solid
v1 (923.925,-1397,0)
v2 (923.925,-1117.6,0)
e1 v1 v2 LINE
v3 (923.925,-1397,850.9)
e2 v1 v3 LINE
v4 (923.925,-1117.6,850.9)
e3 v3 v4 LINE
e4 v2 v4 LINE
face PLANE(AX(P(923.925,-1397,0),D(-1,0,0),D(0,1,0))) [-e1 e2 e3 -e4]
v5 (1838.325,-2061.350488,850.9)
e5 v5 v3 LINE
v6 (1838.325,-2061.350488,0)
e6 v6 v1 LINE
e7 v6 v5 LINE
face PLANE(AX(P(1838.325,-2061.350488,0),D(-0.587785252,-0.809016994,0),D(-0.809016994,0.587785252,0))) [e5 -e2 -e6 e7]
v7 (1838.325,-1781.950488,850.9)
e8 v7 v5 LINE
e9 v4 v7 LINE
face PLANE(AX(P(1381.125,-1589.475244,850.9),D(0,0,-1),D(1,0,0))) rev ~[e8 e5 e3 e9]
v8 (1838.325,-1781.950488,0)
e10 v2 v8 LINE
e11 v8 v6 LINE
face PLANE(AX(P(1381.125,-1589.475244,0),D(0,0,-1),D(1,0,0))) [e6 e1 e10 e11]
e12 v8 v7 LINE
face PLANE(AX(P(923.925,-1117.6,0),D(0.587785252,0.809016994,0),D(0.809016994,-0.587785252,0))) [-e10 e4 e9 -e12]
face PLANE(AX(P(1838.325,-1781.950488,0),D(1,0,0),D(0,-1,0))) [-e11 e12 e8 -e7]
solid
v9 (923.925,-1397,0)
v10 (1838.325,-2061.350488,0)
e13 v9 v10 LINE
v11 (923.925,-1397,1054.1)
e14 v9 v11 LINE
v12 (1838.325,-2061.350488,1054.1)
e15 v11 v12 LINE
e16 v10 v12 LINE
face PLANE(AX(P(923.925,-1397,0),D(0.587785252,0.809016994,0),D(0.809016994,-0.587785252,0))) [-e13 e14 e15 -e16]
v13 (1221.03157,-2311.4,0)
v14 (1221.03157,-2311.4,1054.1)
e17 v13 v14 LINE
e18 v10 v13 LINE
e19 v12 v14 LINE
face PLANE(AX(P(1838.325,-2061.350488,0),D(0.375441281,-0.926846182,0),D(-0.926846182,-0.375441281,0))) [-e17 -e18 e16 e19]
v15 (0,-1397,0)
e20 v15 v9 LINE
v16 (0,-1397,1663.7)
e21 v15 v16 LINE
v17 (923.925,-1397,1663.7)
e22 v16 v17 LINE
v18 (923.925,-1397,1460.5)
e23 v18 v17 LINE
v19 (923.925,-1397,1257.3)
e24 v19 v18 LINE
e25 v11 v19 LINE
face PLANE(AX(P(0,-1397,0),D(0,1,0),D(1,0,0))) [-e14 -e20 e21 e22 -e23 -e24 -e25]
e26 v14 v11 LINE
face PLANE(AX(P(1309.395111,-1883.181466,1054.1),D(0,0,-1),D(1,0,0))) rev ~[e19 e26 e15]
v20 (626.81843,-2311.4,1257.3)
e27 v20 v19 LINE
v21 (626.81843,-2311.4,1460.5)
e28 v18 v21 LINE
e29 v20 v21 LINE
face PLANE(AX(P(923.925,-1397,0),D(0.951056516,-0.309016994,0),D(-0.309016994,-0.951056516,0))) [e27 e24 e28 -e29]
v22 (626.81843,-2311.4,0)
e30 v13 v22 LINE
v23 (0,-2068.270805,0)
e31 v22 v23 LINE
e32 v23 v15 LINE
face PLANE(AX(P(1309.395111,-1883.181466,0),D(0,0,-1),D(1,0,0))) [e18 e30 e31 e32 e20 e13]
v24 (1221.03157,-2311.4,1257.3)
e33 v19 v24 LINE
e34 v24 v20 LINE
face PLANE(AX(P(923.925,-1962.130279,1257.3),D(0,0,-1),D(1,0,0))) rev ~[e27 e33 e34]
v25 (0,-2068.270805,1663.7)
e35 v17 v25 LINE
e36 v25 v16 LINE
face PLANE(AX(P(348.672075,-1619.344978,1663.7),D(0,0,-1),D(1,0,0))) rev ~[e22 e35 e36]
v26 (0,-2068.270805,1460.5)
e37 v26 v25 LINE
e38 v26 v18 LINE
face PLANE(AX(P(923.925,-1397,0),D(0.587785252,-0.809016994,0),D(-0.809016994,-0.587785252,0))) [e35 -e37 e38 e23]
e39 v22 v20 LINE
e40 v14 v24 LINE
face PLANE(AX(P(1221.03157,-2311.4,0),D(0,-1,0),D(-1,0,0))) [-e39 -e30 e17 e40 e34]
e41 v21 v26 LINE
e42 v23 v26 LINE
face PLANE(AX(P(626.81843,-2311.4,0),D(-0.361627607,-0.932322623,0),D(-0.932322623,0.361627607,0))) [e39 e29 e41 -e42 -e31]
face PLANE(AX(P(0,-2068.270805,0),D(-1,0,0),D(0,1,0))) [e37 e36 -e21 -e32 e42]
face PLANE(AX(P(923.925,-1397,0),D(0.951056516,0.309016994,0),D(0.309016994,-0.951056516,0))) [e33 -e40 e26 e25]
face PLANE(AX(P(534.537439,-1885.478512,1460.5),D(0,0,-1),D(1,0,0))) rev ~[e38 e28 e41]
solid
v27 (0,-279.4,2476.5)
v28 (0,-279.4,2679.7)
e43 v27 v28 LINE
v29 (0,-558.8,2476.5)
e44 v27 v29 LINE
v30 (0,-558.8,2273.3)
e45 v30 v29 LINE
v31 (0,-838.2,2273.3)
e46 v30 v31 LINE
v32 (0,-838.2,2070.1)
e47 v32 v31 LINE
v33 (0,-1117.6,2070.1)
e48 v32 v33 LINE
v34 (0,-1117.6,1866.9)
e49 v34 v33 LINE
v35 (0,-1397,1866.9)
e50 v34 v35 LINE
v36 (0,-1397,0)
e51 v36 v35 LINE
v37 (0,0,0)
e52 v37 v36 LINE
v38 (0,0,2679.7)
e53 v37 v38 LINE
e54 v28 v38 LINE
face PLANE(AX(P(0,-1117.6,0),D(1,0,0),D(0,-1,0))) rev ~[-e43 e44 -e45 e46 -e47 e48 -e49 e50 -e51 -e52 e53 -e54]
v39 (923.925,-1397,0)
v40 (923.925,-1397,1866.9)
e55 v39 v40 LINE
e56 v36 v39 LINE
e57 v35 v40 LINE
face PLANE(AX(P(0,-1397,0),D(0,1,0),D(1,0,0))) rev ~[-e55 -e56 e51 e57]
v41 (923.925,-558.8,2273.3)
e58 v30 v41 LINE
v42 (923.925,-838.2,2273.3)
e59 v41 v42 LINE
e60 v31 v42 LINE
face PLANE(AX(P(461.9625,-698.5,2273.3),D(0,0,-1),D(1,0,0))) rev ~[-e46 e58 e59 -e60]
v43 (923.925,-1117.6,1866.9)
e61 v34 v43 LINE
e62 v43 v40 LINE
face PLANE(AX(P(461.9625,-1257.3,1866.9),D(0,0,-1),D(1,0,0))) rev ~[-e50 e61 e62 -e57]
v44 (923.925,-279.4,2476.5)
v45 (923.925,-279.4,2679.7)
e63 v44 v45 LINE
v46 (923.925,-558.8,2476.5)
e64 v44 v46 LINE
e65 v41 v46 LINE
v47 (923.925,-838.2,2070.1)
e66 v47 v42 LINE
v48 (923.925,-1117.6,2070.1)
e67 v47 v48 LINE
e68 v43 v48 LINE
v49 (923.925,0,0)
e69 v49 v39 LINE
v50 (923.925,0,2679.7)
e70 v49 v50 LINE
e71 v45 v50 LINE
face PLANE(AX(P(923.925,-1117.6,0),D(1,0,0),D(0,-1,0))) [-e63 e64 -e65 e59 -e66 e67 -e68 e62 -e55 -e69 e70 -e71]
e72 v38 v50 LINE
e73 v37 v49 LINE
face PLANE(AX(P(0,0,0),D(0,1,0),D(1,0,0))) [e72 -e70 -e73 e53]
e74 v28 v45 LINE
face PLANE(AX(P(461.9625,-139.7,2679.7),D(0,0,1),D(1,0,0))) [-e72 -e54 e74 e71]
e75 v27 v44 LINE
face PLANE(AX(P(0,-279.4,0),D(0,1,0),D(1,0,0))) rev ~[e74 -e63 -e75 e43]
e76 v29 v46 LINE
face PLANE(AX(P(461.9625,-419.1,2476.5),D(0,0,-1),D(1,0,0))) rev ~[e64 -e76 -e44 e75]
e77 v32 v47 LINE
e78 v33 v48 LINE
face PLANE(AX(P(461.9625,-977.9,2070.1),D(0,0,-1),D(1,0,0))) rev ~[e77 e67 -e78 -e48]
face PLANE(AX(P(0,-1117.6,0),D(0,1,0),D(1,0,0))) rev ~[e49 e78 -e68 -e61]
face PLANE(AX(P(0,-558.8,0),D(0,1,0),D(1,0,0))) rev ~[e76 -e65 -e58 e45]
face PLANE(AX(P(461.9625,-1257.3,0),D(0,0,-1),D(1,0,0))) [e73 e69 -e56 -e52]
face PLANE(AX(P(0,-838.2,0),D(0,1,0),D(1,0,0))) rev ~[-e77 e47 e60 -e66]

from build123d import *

# Parameters (mm, degrees)
F0_W      = 923.925
F0_H      = 279.4
F1_DEPTH  = 2679.7
F2_W      = 923.925
F2_H      = 279.4
F3_DEPTH  = 2476.5
F4_W      = 923.925
F4_H      = 279.4
F5_DEPTH  = 2273.3
F6_W      = 923.925
F6_H      = 279.4
F7_DEPTH  = 2070.1
F8_W      = 923.925
F8_H      = 279.4
F9_DEPTH  = 1866.9
F11_DEPTH = 1663.7
F13_DEPTH = 1460.5
F15_DEPTH = 1257.3
F18_DEPTH = 1054.1
F20_DEPTH = 850.9


with BuildPart() as f1:
    # F0 (on Top) → F1 (new body)
    with BuildSketch(Plane.XY):
        with Locations((461.9625, -139.7)):
            Rectangle(F0_W, F0_H)
    extrude(amount=F1_DEPTH)

    # F2 (on face) → F3 (join)
    with BuildSketch(Plane(origin=(0, 0, 0), x_dir=(1, 0, 0), z_dir=(0, 0, -1))):
        with Locations((461.9625, 419.1)):
            Rectangle(F2_W, F2_H)
    extrude(amount=-F3_DEPTH)

    # F4 (on face) → F5 (join)
    with BuildSketch(Plane(origin=(0, 0, 0), x_dir=(1, 0, 0), z_dir=(0, 0, -1))):
        with Locations((461.9625, 698.5)):
            Rectangle(F4_W, F4_H)
    extrude(amount=-F5_DEPTH)

    # F6 (on face) → F7 (join)
    with BuildSketch(Plane(origin=(0, 0, 0), x_dir=(1, 0, 0), z_dir=(0, 0, -1))):
        with Locations((461.9625, 977.9)):
            Rectangle(F6_W, F6_H)
    extrude(amount=-F7_DEPTH)

    # F8 (on face) → F9 (join)
    with BuildSketch(Plane(origin=(0, 0, 0), x_dir=(1, 0, 0), z_dir=(0, 0, -1))):
        with Locations((461.9625, 1257.3)):
            Rectangle(F8_W, F8_H)
    extrude(amount=-F9_DEPTH)


with BuildPart() as f11:
    # F10 (on face) → F11 (new body)
    with BuildSketch(Plane(origin=(0, 0, 0), x_dir=(1, 0, 0), z_dir=(0, 0, -1))):
        Polygon((0, 1397), (923.925, 1397), (0, 2068.2708051874), align=None)
    extrude(amount=-F11_DEPTH)

    # F12 (on face) → F13 (join)
    with BuildSketch(Plane(origin=(0, 0, 0), x_dir=(1, 0, 0), z_dir=(0, 0, -1))):
        Polygon((0, 2068.2708051874), (923.925, 1397), (626.8184297646, 2311.4), align=None)
    extrude(amount=-F13_DEPTH)

    # F14 (on face) → F15 (join)
    with BuildSketch(Plane(origin=(0, 0, 0), x_dir=(1, 0, 0), z_dir=(0, 0, -1))):
        Polygon((626.8184297646, 2311.4), (923.925, 1397), (1221.0315702354, 2311.4), align=None)
    extrude(amount=-F15_DEPTH)

    # F17 (on face) → F18 (join)
    with BuildSketch(Plane(origin=(0, 0, 0), x_dir=(1, 0, 0), z_dir=(0, 0, -1))):
        Polygon((1221.0315702354, 2311.4), (923.925, 1397), (1838.325, 2061.3504876081), align=None)
    extrude(amount=-F18_DEPTH)


with BuildPart() as f20:
    # F19 (on face) → F20 (new body)
    with BuildSketch(Plane(origin=(0, 0, 0), x_dir=(1, 0, 0), z_dir=(0, 0, -1))):
        Polygon((1838.325, 1781.9504876081), (1838.325, 2061.3504876081), (923.925, 1397), (923.925, 1117.6), align=None)
    extrude(amount=-F20_DEPTH)


solid = Compound([f1.part, f11.part, f20.part])
